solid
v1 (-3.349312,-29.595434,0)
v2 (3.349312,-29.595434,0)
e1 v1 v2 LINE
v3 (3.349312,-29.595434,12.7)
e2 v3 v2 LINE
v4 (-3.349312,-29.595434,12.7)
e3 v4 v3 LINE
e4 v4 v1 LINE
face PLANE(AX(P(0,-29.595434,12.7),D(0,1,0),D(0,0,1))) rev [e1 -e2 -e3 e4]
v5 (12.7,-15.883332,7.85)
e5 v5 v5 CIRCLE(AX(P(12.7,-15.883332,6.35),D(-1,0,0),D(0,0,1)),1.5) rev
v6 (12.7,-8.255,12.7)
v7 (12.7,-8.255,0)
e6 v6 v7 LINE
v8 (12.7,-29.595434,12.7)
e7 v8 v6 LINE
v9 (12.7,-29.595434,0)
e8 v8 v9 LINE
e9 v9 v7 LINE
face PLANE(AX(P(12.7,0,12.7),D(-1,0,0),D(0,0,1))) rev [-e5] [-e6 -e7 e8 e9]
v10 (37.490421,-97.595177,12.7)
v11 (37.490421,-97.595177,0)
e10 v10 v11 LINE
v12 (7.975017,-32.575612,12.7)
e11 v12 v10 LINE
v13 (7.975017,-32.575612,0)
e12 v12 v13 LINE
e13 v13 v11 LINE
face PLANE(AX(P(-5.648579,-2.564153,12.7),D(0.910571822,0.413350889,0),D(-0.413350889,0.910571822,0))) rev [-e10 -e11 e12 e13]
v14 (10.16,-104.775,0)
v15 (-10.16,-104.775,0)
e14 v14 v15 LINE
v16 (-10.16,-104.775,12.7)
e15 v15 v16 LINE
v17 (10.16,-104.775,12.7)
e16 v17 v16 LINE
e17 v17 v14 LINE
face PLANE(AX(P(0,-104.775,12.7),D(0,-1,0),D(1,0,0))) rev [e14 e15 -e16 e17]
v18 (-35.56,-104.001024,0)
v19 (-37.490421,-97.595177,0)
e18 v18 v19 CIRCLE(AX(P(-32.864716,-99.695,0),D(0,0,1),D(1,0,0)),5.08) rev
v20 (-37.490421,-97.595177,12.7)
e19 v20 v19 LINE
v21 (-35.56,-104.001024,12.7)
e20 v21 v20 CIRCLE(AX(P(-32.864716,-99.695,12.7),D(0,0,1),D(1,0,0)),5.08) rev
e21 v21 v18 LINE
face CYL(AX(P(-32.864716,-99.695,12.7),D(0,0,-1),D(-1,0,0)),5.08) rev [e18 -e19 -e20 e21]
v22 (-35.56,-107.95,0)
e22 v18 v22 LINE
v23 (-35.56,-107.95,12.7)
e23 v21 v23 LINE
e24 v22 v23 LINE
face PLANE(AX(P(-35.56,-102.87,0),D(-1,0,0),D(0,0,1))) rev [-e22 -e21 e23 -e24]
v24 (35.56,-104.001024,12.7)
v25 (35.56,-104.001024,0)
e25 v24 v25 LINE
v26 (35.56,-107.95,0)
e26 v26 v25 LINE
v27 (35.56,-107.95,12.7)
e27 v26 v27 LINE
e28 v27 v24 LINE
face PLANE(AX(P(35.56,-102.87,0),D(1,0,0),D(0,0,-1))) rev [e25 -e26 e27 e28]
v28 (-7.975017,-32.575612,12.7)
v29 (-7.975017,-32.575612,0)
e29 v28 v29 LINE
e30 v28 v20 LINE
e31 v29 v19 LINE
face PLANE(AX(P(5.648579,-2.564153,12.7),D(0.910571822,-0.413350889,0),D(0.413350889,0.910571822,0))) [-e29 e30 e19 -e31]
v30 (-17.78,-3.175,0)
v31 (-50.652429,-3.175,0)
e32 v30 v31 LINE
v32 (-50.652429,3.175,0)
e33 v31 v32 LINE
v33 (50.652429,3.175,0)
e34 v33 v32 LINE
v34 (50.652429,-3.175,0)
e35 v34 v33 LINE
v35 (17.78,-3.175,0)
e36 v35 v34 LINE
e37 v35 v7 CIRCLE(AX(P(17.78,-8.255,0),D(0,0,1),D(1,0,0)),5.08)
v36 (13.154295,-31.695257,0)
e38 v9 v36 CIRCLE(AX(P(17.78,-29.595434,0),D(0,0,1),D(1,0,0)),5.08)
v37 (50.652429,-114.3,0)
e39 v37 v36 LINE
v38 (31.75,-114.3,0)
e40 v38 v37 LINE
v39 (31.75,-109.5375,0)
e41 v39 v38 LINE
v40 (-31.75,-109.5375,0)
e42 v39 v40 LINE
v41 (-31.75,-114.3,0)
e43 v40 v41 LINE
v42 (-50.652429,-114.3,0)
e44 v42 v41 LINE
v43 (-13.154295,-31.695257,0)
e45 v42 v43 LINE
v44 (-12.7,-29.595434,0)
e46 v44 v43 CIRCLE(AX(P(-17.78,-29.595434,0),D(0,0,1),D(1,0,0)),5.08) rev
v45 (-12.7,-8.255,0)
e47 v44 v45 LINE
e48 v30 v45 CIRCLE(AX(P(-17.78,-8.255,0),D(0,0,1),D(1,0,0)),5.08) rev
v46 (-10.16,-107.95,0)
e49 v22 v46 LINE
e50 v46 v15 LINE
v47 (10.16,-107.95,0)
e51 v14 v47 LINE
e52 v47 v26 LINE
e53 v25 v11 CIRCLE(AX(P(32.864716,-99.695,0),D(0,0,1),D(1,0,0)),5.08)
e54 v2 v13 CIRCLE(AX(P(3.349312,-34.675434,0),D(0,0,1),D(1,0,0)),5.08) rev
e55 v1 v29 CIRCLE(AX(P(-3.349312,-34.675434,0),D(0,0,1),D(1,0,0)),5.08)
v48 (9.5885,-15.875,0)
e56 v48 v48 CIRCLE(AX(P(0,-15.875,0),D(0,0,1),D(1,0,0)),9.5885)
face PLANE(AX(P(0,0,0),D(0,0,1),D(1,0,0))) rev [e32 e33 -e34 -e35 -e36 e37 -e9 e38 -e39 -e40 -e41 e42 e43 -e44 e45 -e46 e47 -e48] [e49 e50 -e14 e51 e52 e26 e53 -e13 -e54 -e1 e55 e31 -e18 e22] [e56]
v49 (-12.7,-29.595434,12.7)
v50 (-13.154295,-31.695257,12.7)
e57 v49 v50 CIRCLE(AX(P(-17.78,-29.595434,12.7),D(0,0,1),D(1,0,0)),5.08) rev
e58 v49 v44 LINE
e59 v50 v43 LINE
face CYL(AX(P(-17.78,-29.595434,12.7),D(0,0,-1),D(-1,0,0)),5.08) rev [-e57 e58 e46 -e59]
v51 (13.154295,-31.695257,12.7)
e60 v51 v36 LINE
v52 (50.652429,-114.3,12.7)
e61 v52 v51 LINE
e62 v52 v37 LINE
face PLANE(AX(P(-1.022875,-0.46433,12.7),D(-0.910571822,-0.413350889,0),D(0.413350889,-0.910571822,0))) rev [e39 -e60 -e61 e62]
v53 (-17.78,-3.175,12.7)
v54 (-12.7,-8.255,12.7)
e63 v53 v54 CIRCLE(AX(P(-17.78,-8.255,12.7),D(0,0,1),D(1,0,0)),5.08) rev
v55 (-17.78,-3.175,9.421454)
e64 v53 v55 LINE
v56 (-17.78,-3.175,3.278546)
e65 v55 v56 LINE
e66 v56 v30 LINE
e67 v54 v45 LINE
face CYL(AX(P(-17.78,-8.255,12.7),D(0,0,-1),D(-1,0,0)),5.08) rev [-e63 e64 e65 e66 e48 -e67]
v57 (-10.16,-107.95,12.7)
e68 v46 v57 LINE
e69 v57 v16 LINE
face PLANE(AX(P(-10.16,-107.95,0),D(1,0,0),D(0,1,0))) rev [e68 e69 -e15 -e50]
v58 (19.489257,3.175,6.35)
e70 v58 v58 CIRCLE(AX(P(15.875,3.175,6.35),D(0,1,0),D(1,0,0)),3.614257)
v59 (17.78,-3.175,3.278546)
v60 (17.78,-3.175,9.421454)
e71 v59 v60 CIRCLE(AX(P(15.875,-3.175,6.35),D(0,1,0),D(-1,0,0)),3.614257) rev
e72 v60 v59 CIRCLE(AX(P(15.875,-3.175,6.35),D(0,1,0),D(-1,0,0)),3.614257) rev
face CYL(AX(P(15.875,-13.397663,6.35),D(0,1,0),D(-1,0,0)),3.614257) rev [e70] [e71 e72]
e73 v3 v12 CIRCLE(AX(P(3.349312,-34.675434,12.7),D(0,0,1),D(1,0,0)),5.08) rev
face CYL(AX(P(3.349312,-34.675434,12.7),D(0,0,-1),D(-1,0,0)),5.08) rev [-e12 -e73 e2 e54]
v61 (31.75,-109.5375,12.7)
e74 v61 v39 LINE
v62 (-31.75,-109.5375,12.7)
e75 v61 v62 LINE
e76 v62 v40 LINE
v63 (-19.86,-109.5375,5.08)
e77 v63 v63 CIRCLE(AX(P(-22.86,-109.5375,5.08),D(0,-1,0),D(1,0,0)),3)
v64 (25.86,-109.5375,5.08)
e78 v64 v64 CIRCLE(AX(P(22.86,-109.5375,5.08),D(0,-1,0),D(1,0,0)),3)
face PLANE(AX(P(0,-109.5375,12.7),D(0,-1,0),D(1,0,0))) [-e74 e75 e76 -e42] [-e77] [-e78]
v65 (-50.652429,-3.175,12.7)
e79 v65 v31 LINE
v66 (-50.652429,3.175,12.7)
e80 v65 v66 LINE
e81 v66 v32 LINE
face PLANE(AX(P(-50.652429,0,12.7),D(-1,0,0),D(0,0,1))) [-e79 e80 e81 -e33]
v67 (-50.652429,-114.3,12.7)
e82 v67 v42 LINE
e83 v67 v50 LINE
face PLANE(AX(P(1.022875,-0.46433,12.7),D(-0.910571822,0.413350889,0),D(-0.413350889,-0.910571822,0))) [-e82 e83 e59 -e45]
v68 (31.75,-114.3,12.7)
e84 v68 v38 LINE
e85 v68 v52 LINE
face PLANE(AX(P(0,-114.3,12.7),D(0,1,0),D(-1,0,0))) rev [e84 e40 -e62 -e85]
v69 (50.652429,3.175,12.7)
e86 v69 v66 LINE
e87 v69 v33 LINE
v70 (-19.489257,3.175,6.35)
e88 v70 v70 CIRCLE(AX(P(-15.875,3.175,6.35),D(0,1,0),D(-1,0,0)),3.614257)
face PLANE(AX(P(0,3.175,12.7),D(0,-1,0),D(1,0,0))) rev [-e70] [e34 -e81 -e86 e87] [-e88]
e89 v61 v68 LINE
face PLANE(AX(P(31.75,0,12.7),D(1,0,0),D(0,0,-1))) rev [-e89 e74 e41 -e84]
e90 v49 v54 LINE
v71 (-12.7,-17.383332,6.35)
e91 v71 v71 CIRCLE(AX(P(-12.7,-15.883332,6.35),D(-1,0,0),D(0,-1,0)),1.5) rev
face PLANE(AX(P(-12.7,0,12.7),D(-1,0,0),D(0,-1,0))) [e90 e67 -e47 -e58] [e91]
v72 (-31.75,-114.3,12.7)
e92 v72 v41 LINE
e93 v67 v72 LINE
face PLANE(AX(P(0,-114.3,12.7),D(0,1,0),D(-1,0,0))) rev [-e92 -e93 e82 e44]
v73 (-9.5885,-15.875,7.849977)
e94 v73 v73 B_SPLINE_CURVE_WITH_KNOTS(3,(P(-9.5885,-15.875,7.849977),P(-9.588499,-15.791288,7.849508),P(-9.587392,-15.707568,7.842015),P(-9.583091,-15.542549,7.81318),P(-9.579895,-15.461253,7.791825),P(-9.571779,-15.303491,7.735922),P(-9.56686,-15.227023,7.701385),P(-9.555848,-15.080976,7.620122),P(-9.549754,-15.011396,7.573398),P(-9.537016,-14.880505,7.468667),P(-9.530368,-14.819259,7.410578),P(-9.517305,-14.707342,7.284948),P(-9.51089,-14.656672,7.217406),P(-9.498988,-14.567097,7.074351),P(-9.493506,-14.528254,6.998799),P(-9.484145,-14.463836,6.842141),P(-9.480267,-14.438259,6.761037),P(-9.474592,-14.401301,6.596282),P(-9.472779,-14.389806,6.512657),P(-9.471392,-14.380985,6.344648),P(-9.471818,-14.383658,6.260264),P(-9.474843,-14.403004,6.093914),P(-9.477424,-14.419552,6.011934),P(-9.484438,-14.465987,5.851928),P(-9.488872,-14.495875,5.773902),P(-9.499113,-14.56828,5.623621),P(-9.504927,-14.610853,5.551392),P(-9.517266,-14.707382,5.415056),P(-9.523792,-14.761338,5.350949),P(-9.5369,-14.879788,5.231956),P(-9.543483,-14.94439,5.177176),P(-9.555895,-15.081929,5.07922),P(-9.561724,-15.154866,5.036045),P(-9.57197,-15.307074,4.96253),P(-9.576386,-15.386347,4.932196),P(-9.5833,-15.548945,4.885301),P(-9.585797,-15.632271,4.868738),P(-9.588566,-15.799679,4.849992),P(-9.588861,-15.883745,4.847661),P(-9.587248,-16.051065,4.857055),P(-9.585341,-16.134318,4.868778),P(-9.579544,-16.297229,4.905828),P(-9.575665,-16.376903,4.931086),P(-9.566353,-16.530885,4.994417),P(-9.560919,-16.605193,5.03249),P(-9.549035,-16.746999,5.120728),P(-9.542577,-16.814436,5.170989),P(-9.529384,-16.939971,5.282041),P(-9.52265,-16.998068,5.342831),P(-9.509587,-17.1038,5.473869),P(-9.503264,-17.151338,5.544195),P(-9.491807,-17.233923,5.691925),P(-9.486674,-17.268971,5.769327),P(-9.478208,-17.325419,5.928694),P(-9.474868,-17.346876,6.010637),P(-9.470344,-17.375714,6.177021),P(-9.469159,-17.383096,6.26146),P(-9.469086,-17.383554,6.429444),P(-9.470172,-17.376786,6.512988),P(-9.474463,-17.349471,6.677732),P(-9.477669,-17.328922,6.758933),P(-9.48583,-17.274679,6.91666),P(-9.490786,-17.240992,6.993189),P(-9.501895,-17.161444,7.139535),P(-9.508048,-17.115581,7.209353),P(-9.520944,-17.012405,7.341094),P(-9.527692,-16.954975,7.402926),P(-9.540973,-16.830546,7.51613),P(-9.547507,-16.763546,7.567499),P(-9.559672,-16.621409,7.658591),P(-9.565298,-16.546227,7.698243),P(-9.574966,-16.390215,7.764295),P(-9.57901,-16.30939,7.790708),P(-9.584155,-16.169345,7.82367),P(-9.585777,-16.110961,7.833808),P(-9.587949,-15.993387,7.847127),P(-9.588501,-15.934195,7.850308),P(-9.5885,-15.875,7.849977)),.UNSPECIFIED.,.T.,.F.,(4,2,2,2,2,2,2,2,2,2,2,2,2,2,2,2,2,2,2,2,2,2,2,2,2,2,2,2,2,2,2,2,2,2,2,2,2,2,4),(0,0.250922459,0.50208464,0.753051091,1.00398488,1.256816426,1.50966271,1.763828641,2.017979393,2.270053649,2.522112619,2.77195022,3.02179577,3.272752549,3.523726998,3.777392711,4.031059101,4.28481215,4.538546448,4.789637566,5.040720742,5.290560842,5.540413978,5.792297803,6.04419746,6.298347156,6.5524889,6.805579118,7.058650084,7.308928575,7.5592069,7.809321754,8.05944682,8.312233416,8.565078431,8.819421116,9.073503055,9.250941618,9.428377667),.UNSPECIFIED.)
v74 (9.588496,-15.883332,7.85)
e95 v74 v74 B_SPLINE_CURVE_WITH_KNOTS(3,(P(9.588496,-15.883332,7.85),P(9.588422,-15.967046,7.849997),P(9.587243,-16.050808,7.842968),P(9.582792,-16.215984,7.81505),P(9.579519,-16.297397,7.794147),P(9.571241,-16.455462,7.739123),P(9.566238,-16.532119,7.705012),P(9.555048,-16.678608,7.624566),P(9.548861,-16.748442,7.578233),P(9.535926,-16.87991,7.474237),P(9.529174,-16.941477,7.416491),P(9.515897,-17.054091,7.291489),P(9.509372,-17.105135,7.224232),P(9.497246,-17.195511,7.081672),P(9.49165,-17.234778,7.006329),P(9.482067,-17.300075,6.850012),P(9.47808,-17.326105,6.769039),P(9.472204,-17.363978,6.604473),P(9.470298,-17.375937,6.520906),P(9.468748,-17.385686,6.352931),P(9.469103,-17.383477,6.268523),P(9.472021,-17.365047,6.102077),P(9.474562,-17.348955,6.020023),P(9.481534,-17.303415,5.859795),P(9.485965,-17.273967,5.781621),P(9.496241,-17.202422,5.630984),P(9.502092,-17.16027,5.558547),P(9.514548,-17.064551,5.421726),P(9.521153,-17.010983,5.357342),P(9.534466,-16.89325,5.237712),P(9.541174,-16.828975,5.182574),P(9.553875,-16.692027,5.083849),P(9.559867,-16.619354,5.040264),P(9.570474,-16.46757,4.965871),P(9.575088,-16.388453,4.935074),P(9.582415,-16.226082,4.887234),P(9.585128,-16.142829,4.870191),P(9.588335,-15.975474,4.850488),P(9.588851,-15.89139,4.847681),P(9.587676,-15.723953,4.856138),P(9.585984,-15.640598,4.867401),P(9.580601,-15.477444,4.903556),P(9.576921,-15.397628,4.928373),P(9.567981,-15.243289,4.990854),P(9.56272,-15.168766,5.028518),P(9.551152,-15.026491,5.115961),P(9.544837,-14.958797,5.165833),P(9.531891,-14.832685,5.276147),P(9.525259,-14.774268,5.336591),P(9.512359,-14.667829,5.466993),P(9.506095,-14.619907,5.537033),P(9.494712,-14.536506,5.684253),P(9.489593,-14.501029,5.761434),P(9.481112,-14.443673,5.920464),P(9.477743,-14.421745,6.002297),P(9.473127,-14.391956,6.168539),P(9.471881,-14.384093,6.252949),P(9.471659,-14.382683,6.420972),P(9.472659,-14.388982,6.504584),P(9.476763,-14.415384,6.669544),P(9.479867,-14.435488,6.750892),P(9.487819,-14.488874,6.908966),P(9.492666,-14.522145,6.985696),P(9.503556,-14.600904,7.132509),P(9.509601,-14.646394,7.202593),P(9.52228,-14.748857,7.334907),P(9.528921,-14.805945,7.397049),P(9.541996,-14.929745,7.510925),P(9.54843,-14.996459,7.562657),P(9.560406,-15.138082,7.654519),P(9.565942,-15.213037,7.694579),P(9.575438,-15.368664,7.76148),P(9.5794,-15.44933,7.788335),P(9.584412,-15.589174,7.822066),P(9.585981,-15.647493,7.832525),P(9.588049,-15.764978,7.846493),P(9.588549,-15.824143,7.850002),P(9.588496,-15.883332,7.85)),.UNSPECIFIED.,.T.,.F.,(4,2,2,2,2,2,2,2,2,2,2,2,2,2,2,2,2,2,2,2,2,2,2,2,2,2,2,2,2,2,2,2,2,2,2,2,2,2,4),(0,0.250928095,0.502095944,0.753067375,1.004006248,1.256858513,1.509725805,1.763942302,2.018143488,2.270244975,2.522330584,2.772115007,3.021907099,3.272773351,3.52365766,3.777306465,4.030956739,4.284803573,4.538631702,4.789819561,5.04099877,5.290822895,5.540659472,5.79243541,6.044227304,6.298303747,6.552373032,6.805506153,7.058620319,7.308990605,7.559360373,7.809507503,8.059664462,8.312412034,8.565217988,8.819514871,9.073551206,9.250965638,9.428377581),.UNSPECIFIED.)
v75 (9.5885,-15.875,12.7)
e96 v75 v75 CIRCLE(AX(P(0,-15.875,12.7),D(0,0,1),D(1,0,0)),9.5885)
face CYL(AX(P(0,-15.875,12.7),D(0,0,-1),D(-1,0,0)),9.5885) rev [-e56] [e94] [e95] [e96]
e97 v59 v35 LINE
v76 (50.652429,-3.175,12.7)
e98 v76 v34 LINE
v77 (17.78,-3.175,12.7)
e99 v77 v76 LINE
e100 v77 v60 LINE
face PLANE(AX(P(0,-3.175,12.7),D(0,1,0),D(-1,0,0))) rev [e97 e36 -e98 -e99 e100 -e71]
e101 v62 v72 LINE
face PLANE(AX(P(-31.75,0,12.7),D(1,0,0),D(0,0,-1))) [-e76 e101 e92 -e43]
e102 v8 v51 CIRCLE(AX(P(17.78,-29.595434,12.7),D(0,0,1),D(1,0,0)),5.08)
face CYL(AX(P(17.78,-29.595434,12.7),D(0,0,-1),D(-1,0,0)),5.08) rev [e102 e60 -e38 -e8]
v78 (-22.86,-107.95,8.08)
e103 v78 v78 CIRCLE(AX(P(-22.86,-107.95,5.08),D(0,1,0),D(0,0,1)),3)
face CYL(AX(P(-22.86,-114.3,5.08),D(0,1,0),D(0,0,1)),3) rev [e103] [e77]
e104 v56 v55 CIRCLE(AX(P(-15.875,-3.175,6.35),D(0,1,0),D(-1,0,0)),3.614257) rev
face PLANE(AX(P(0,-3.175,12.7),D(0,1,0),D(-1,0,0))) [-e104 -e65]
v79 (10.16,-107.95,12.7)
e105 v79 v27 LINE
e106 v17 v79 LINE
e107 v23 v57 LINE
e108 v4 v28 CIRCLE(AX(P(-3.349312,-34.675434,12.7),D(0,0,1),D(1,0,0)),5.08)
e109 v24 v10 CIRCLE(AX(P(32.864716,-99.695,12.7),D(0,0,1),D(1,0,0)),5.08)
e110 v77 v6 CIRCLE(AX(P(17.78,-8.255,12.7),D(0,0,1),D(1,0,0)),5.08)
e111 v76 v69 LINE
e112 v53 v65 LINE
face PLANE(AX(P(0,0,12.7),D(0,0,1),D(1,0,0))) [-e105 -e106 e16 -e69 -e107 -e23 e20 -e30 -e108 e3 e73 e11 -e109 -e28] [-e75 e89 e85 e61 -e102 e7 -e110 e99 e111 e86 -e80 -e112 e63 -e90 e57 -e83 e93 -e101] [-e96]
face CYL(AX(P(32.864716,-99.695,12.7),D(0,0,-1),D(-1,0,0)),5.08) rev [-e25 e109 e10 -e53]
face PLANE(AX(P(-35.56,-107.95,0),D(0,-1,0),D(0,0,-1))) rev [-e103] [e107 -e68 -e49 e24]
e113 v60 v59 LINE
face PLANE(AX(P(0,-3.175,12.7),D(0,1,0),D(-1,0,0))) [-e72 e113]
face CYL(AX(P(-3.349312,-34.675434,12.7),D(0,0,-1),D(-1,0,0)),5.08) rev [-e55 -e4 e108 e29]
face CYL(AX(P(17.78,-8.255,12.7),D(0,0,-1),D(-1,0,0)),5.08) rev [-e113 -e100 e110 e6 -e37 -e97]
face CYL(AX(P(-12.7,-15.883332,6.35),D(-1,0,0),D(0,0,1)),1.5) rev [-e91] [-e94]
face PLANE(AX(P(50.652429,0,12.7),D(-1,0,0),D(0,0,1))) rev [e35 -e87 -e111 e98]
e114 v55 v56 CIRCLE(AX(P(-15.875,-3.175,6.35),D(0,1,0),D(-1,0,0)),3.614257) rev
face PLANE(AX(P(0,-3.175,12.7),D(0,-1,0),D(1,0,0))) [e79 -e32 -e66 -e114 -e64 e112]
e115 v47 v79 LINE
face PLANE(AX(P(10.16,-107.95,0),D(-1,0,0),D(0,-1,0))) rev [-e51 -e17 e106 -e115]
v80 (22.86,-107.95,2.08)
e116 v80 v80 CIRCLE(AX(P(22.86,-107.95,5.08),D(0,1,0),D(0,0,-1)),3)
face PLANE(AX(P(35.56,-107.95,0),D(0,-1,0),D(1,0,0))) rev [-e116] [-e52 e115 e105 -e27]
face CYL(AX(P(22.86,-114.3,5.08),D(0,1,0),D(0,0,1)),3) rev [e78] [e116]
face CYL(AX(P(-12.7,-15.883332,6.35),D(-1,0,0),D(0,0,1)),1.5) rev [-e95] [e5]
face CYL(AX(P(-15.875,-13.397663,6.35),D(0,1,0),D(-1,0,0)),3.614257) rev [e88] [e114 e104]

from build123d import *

# Parameters (mm, degrees)
SKETCH3_R               = 9.5885
BOSS_EXTRUDE1_DEPTH     = 12.7
SKETCH4_R               = 3.614257139
CUT_EXTRUDE1_DEPTH      = 6.35
CUT_EXTRUDE2_START      = -12.7
CUT_EXTRUDE2_OUTLINE_R  = 1.5
CUT_EXTRUDE2_DEPTH      = 25.4
CUT_EXTRUDE3_DEPTH      = 126.664030474
CUT_EXTRUDE3_DEPTH_BACK = 126.664030474
SKETCH8_W               = 25.4
SKETCH8_H               = 5.08
SKETCH9_R               = 3
CUT_EXTRUDE4_DEPTH      = 123.783240632


# Read off the part's stored shape, not the designer's step: Cut-Extrude2
with BuildPart() as part:
    # Sketch3 → Boss-Extrude1 (new body)
    with BuildSketch(Plane.XY):
        with BuildLine():
            Line((50.652428891, 3.175), (-50.652428891, 3.175))
            Line((-50.652428891, 3.175), (-50.652428891, -3.175))
            Line((-50.652428891, -3.175), (-17.78, -3.175))
            ThreePointArc((-17.78, -3.175), (-14.187897552, -4.662897552), (-12.7, -8.255))
            Line((-12.7, -8.255), (-12.7, -29.595434395))
            ThreePointArc((-12.7, -29.595434395), (-12.814872576, -30.66963627), (-13.154295145, -31.69525691))
            Line((-13.154295145, -31.69525691), (-50.652428891, -114.3))
            Line((-50.652428891, -114.3), (-31.75, -114.3))
            Line((-31.75, -114.3), (-31.75, -109.5375))
            Line((-31.75, -109.5375), (31.75, -109.5375))
            Line((31.75, -109.5375), (31.75, -114.3))
            Line((31.75, -114.3), (50.652428891, -114.3))
            Line((50.652428891, -114.3), (13.154295145, -31.69525691))
            ThreePointArc((13.154295145, -31.69525691), (12.814872576, -30.66963627), (12.7, -29.595434395))
            Line((12.7, -29.595434395), (12.7, -8.255))
            ThreePointArc((12.7, -8.255), (14.187897552, -4.662897552), (17.78, -3.175))
            Line((17.78, -3.175), (50.652428891, -3.175))
            Line((50.652428891, -3.175), (50.652428891, 3.175))
        make_face()
        with Locations((0, -15.875)):
            Circle(SKETCH3_R, mode=Mode.SUBTRACT)
        with BuildLine():
            Line((-7.97501727, -32.575611881), (-37.490421301, -97.595177486))
            ThreePointArc((-37.490421301, -97.595177486), (-37.135167146, -102.446299841), (-32.864716446, -104.775))
            Line((-32.864716446, -104.775), (0, -104.775))
            Line((0, -104.775), (32.864716446, -104.775))
            ThreePointArc((32.864716446, -104.775), (37.135167146, -102.446299841), (37.490421301, -97.595177486))
            Line((37.490421301, -97.595177486), (7.97501727, -32.575611881))
            ThreePointArc((7.97501727, -32.575611881), (6.100612256, -30.404983695), (3.349312415, -29.595434395))
            Line((3.349312415, -29.595434395), (-3.349312415, -29.595434395))
            ThreePointArc((-3.349312415, -29.595434395), (-6.100612256, -30.404983695), (-7.97501727, -32.575611881))
        make_face(mode=Mode.SUBTRACT)
    extrude(amount=BOSS_EXTRUDE1_DEPTH)

    # Sketch4 → Cut-Extrude1 (cut)
    with BuildSketch(Plane(origin=(0, 3.175, 0), x_dir=(1, 0, 0), z_dir=(0, 1, 0))):
        with Locations(Location((-15.875, -6.35, 0), (0, 0, 180))):
            Circle(SKETCH4_R)
        with Locations(Location((15.875, -6.35, 0), (0, 0, 301.808324175))):
            Circle(SKETCH4_R)
    extrude(amount=-CUT_EXTRUDE1_DEPTH, mode=Mode.SUBTRACT)

    # Cut-Extrude2 outline → Cut-Extrude2 (cut)
    with BuildSketch(Plane.YZ.offset(CUT_EXTRUDE2_START)):
        with Locations((-15.883331584, 6.35)):
            Circle(CUT_EXTRUDE2_OUTLINE_R)
    extrude(amount=CUT_EXTRUDE2_DEPTH, mode=Mode.SUBTRACT)

    # Sketch8 → Cut-Extrude3 (cut, two sides: drawn at the far end of the back side and taken through both)
    with BuildSketch(Plane.XY.offset(12.7).offset(-CUT_EXTRUDE3_DEPTH_BACK)):
        with Locations((-22.86, -105.41)):
            Rectangle(SKETCH8_W, SKETCH8_H)
        with Locations((22.86, -105.41)):
            Rectangle(SKETCH8_W, SKETCH8_H)
    extrude(amount=CUT_EXTRUDE3_DEPTH + CUT_EXTRUDE3_DEPTH_BACK, mode=Mode.SUBTRACT)

    # Sketch9 → Cut-Extrude4 (cut, through all)
    with BuildSketch(Plane(origin=(0, -107.95, 0), x_dir=(1, 0, 0), z_dir=(0, 1, 0))):
        with Locations(Location((-22.86, -5.08, 0), (0, 0, 270))):
            Circle(SKETCH9_R)
        with Locations((22.86, -5.08)):
            Circle(SKETCH9_R)
    extrude(amount=-CUT_EXTRUDE4_DEPTH, mode=Mode.SUBTRACT)


solid = part.part
